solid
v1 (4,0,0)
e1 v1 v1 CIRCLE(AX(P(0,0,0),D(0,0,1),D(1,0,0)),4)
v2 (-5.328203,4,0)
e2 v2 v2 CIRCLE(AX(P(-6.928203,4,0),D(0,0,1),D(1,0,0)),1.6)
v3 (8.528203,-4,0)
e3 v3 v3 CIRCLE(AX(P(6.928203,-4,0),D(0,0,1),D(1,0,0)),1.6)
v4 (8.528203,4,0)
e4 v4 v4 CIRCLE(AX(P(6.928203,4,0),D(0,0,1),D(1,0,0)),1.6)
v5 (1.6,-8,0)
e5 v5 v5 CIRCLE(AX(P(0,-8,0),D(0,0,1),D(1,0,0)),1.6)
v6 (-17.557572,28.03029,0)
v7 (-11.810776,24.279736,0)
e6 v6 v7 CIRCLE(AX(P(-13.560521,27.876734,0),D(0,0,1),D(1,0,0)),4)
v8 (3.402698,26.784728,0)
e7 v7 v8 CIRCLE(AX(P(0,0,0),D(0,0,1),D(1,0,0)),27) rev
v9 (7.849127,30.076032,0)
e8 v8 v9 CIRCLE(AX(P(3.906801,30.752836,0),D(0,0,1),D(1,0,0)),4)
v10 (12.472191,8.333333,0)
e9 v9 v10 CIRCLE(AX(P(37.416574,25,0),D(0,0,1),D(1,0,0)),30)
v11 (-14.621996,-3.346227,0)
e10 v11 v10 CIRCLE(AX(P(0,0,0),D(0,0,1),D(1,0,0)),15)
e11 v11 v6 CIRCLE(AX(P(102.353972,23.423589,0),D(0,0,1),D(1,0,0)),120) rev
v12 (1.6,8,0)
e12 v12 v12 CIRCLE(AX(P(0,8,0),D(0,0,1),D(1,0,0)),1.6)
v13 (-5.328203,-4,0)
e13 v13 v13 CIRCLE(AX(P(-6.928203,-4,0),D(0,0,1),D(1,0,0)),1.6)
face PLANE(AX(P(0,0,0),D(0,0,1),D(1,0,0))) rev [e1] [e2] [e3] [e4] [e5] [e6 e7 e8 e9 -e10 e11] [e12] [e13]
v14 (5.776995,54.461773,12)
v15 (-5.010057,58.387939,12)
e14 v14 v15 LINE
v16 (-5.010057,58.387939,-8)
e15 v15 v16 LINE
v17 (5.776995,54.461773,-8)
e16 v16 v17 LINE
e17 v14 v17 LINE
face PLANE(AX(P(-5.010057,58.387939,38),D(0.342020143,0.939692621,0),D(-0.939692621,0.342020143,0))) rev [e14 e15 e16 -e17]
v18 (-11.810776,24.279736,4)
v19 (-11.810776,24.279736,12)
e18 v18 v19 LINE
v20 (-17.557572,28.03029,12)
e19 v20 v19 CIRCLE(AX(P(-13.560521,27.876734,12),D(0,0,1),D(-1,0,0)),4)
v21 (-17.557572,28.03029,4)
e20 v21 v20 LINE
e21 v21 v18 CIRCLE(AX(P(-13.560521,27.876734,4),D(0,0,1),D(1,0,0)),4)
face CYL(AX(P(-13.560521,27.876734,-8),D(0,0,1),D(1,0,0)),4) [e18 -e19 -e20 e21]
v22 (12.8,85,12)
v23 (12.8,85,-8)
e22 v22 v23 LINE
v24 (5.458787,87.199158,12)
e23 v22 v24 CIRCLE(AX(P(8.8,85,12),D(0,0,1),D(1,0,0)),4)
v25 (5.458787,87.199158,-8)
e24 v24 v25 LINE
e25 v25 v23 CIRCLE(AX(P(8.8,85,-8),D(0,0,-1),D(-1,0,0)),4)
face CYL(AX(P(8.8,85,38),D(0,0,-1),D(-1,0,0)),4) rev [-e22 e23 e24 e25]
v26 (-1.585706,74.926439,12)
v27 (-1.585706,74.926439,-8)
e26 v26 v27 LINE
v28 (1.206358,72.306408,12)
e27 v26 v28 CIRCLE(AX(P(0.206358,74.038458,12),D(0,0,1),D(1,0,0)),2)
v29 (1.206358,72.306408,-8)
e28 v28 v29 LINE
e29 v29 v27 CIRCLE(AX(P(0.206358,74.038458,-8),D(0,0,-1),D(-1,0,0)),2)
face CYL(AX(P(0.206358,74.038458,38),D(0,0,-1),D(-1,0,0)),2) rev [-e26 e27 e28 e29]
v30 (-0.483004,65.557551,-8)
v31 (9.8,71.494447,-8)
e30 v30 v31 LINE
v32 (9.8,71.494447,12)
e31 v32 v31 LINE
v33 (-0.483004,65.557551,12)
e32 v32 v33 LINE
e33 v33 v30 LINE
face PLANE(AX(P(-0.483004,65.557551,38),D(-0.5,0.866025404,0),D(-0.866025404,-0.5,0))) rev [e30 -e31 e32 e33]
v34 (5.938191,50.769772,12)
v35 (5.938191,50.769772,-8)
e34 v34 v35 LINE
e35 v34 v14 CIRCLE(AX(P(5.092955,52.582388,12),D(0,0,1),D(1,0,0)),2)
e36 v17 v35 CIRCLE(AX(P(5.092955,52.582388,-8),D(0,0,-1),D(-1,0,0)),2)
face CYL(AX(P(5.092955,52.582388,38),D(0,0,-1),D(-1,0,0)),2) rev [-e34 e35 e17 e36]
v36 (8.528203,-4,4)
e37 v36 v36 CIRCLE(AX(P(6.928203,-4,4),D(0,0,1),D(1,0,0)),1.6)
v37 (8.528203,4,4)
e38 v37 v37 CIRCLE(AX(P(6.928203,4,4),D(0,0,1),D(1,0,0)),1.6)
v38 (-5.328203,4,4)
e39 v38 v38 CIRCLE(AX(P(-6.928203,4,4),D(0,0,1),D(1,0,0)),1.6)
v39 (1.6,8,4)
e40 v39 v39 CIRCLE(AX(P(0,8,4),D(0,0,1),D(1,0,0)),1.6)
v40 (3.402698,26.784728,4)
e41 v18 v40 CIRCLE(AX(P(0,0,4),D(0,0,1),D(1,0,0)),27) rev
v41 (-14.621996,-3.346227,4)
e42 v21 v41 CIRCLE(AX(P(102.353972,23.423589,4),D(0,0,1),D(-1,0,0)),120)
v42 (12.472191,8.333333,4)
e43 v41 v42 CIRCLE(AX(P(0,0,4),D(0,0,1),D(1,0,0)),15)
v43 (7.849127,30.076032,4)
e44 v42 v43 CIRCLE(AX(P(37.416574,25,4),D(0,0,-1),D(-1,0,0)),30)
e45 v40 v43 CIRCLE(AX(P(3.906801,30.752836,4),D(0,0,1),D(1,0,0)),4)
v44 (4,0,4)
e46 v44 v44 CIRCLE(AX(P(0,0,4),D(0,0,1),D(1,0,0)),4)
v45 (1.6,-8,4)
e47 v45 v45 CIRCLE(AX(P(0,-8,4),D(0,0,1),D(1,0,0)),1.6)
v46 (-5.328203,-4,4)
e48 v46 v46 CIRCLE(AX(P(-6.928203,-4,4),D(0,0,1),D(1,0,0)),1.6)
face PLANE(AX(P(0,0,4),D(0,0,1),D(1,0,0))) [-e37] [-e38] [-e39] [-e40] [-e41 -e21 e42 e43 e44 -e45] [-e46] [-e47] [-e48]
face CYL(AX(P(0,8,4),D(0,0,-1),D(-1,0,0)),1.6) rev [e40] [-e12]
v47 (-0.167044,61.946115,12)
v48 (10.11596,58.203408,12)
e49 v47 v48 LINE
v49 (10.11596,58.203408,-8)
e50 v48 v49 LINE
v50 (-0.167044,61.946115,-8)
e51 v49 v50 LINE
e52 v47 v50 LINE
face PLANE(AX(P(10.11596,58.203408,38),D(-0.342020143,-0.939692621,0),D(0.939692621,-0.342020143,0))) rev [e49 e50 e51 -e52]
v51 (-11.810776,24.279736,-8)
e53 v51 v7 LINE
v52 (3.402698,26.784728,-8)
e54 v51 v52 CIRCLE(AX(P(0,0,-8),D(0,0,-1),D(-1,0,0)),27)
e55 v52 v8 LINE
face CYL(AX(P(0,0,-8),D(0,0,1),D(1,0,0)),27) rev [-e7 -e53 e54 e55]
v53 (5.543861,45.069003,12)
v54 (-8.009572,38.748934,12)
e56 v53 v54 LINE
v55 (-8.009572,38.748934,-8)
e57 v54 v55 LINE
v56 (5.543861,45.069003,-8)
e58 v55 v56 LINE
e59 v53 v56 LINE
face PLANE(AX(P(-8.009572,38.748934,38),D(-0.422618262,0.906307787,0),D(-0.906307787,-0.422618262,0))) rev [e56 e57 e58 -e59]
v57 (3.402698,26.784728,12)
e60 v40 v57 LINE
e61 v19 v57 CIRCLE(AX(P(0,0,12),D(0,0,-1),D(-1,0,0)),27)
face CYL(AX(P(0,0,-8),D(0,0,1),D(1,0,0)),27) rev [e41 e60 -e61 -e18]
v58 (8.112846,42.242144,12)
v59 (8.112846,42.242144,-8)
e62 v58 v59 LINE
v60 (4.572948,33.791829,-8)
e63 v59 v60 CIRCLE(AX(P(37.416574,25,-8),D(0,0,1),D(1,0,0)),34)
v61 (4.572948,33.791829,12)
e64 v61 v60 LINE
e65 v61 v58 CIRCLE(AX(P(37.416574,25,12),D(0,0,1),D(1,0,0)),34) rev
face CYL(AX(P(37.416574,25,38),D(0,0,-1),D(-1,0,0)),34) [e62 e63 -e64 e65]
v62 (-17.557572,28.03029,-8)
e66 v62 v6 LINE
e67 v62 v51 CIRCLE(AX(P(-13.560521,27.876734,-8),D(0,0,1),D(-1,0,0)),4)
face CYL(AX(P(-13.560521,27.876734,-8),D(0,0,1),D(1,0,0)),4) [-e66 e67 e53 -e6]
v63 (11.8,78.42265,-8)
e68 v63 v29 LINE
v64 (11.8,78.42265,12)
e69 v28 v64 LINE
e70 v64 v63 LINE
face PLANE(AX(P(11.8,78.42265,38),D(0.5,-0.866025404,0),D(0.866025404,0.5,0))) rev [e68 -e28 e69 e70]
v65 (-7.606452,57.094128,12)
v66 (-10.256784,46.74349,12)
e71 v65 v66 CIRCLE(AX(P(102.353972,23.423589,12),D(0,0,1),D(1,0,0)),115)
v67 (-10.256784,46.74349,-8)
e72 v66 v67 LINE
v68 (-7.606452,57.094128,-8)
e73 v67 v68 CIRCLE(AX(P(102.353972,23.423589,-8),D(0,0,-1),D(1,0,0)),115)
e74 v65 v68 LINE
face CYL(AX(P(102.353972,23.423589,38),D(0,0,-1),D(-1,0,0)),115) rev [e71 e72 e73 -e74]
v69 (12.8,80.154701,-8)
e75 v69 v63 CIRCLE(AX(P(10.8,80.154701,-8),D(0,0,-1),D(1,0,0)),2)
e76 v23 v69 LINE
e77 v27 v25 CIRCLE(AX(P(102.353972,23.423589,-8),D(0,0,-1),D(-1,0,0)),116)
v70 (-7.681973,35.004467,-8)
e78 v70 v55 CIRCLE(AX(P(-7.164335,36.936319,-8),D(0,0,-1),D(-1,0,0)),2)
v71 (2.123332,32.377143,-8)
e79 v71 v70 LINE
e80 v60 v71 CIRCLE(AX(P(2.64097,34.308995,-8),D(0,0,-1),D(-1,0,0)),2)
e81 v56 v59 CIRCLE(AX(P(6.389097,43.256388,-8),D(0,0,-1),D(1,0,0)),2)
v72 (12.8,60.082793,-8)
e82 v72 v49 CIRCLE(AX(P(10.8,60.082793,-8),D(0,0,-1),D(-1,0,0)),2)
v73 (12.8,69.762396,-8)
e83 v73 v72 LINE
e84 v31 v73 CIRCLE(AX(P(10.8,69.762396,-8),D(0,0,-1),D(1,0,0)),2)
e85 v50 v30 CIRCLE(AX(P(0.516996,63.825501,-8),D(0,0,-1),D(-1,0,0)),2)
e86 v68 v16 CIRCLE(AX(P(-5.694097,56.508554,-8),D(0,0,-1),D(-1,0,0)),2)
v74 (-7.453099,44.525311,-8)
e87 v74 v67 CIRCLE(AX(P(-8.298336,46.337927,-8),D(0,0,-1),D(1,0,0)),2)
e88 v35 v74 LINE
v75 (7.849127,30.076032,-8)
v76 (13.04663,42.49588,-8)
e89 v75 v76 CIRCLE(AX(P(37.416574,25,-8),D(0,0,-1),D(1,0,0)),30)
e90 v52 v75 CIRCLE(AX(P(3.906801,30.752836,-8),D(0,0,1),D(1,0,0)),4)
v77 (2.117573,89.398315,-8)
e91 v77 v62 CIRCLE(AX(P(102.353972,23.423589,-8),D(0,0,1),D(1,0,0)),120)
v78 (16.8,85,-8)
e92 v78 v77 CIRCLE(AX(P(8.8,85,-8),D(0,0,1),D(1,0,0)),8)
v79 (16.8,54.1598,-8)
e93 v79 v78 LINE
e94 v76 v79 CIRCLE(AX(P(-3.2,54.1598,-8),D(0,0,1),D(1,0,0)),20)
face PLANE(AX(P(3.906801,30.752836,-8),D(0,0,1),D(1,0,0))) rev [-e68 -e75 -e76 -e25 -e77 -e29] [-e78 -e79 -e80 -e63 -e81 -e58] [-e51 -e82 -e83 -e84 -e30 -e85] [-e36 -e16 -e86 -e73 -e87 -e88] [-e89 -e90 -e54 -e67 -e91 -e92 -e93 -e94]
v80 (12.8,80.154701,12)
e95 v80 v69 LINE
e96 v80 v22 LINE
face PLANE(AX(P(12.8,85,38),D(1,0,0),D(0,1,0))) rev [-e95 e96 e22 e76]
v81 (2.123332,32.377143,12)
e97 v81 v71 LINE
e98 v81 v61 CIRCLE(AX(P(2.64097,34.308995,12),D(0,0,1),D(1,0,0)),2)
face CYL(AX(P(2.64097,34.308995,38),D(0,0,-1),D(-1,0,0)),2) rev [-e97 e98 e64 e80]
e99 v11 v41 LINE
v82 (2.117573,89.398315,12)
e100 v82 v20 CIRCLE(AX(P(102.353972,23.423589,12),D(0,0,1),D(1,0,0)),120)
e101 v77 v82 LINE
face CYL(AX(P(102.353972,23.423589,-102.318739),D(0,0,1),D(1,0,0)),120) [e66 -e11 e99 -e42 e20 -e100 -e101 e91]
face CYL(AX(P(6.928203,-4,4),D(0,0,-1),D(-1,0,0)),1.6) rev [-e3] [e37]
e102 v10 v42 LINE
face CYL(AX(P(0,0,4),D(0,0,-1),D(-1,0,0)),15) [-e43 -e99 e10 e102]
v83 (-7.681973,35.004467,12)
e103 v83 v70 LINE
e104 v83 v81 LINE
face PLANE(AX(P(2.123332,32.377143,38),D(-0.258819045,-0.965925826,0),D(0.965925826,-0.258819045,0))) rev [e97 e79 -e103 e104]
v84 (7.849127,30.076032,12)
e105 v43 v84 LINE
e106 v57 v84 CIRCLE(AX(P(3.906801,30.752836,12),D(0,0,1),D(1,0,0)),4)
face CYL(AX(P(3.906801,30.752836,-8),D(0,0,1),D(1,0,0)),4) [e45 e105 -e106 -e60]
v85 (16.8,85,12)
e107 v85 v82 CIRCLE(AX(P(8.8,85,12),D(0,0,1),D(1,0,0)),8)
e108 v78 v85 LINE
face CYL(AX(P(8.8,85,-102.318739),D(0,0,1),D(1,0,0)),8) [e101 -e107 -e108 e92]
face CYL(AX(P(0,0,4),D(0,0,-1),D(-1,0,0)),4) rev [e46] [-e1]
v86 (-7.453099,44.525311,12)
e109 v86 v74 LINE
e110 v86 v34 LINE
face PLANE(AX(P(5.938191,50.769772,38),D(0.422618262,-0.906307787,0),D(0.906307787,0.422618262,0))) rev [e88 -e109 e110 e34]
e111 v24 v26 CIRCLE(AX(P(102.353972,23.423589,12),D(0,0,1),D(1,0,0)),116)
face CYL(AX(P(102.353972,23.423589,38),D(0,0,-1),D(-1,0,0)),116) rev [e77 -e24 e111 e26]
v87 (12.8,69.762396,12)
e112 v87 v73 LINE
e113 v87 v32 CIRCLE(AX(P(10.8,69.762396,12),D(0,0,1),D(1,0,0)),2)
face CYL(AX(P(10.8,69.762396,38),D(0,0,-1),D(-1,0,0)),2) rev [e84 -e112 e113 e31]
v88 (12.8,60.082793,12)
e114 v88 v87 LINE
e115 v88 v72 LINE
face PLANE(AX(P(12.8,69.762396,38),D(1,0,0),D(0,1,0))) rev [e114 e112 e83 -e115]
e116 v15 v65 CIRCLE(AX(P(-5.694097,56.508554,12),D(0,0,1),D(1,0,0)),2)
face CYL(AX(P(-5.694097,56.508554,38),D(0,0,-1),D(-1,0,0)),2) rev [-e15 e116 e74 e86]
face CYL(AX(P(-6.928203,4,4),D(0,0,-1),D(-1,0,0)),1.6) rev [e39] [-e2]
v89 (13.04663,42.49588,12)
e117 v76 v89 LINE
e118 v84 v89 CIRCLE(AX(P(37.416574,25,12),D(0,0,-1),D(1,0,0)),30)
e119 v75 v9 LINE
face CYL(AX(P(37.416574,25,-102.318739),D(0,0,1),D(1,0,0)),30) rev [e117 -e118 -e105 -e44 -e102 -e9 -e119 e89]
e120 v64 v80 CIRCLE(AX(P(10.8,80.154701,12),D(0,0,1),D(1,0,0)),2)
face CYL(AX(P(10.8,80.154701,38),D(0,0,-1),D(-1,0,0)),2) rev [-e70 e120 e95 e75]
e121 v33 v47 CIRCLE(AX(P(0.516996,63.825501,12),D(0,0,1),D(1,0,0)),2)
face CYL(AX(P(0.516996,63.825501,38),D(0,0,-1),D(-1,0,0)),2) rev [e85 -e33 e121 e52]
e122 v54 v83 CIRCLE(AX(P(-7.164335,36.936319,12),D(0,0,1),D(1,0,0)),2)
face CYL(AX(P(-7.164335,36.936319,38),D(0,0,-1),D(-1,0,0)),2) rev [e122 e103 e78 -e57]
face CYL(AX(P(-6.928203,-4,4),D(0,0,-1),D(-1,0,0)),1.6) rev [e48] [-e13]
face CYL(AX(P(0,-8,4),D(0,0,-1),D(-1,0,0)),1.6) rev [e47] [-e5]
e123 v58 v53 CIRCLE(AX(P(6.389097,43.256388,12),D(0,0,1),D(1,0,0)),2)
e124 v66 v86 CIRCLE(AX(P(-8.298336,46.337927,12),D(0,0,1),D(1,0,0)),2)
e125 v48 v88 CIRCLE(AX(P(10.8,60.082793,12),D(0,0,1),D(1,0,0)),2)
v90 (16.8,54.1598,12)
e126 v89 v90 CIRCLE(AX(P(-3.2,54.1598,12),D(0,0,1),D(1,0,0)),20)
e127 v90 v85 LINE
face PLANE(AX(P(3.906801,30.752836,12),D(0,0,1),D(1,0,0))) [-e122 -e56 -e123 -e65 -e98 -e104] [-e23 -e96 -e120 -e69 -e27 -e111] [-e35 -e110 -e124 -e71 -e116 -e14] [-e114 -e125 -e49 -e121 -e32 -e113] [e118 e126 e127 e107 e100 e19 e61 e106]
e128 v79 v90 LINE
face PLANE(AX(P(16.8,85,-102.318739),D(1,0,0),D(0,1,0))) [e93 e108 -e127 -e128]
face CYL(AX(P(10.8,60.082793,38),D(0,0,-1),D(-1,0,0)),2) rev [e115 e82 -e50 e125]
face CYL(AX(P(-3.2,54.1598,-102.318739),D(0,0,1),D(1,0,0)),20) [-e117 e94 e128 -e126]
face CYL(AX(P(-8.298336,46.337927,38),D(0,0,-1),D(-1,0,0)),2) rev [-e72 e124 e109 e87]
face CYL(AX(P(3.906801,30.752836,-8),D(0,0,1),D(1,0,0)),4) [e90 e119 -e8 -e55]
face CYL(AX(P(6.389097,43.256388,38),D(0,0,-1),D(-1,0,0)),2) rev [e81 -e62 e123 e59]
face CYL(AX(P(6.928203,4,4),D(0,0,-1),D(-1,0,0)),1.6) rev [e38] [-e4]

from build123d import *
from build123d.topology import SkipClean

# Parameters (mm, degrees)
SKETCH_1_R           = 15
SKETCH_1_R_2         = 4
SKETCH_1_R_3         = 1.6
EXTRUDE_1_DEPTH      = 4
EXTRUDE_START        = -4
EXTRUDE_3_DEPTH      = 4
EXTRUDE_4_DEPTH      = 8
EXTRUDE_4_DEPTH_BACK = 12
CUT_EXTRUDE_1_DEPTH  = 46


with BuildPart() as part:
    # 草图1 → 凸台-拉伸1 (new body)
    with BuildSketch(Plane.XY):
        Circle(SKETCH_1_R)
        Circle(SKETCH_1_R_2, mode=Mode.SUBTRACT)
        with Locations((0, 8)):
            Circle(SKETCH_1_R_3, mode=Mode.SUBTRACT)
        with Locations((6.92820323, 4)):
            Circle(SKETCH_1_R_3, mode=Mode.SUBTRACT)
        with Locations((6.92820323, -4)):
            Circle(SKETCH_1_R_3, mode=Mode.SUBTRACT)
        with Locations((0, -8)):
            Circle(SKETCH_1_R_3, mode=Mode.SUBTRACT)
        with Locations((-6.92820323, -4)):
            Circle(SKETCH_1_R_3, mode=Mode.SUBTRACT)
        with Locations((-6.92820323, 4)):
            Circle(SKETCH_1_R_3, mode=Mode.SUBTRACT)
    extrude(amount=EXTRUDE_1_DEPTH)

    # 草图2 → 凸台-拉伸3 (add)
    with BuildSketch(Plane.XY.offset(4).offset(EXTRUDE_START)):
        with BuildLine():
            Line((16.8, 85), (16.8, 54.159799849))
            ThreePointArc((16.8, 54.159799849), (15.83854762, 48.033324147), (13.046629547, 42.49587991))
            ThreePointArc((13.046629547, 42.49587991), (7.420814059, 25.504374344), (12.472191289, 8.333333333))
            ThreePointArc((12.472191289, 8.333333333), (-5.937882388, 13.774670695), (-14.621995932, -3.346226976))
            ThreePointArc((-14.621995932, -3.346226976), (-15.737901413, 44.738127218), (2.117573463, 89.398315084))
            ThreePointArc((2.117573463, 89.398315084), (11.095712057, 92.663530919), (16.8, 85))
        make_face()
    extrude(amount=EXTRUDE_3_DEPTH)

    # 草图3 → 凸台-拉伸4 (add, two sides: drawn at the far end of the back side and taken through both)
    with SkipClean():  # the faces are left unmerged after this step: merging them gives an invalid solid
        with BuildSketch(Plane.XY.offset(4).offset(-EXTRUDE_4_DEPTH_BACK)):
            with BuildLine():
                Line((16.8, 54.159799849), (16.8, 85))
                ThreePointArc((16.8, 85), (11.095712057, 92.663530919), (2.117573463, 89.398315084))
                ThreePointArc((2.117573463, 89.398315084), (-11.916705707, 60.059804871), (-17.55757213, 28.030290369))
                ThreePointArc((-17.55757213, 28.030290369), (-15.746673, 24.526996644), (-11.810776072, 24.27973576))
                ThreePointArc((-11.810776072, 24.27973576), (-4.386649325, 26.64127076), (3.402697603, 26.784727906))
                ThreePointArc((3.402697603, 26.784727906), (6.286614818, 27.53779516), (7.849127177, 30.076031539))
                ThreePointArc((7.849127177, 30.076031539), (9.742150736, 36.581291134), (13.046629547, 42.49587991))
                ThreePointArc((13.046629547, 42.49587991), (15.83854762, 48.033324147), (16.8, 54.159799849))
            make_face()
        extrude(amount=EXTRUDE_4_DEPTH + EXTRUDE_4_DEPTH_BACK)
    add(part.part.scale(1), mode=Mode.REPLACE)  # the faces are merged on a copy

    # 草图5 → 切除-拉伸1 (cut)
    with BuildSketch(Plane(origin=(0, 0, -8), x_dir=(-1, 0, 0), z_dir=(0, 0, -1))):
        with BuildLine():
            Line((-12.8, 69.762395693), (-12.8, 60.082793322))
            ThreePointArc((-12.8, 60.082793322), (-11.947152873, 58.444489233), (-10.115959713, 58.20340808))
            Line((-10.115959713, 58.20340808), (0.167044148, 61.946115404))
            ThreePointArc((0.167044148, 61.946115404), (1.475393257, 63.65118916), (0.483003861, 65.557551453))
            Line((0.483003861, 65.557551453), (-9.8, 71.494446501))
            ThreePointArc((-9.8, 71.494446501), (-11.8, 71.494446501), (-12.8, 69.762395693))
        make_face()
        with BuildLine():
            Line((-11.8, 78.422649731), (-1.206357847, 72.306407582))
            ThreePointArc((-1.206357847, 72.306407582), (1.162211364, 72.580028303), (1.585705551, 74.926438557))
            ThreePointArc((1.585705551, 74.926438557), (-1.749223409, 81.170317372), (-5.458786731, 87.199157542))
            ThreePointArc((-5.458786731, 87.199157542), (-9.947856029, 88.83176546), (-12.8, 85))
            Line((-12.8, 85), (-12.8, 80.154700538))
            ThreePointArc((-12.8, 80.154700538), (-12.532050808, 79.154700538), (-11.8, 78.422649731))
        make_face()
        with BuildLine():
            Line((5.01005666, 58.38793894), (-5.776995128, 54.461773174))
            ThreePointArc((-5.776995128, 54.461773174), (-7.091051284, 52.669626708), (-5.938191364, 50.769772359))
            Line((-5.938191364, 50.769772359), (7.453099332, 44.525310955))
            ThreePointArc((7.453099332, 44.525310955), (9.539258698, 44.76945259), (10.256783773, 46.743490028))
            ThreePointArc((10.256783773, 46.743490028), (9.051891671, 51.949605837), (7.60645214, 57.094128298))
            ThreePointArc((7.60645214, 57.094128298), (6.586103601, 58.298616303), (5.01005666, 58.38793894))
        make_face()
        with BuildLine():
            Line((-2.123332063, 32.377143259), (7.681973135, 35.004466868))
            ThreePointArc((7.681973135, 35.004466868), (9.156724441, 36.762007035), (8.009571568, 38.748934095))
            Line((8.009571568, 38.748934095), (-5.543860738, 45.069003373))
            ThreePointArc((-5.543860738, 45.069003373), (-7.869208523, 44.601479118), (-8.112845962, 42.242144033))
            ThreePointArc((-8.112845962, 42.242144033), (-6.056960525, 38.136767143), (-4.572948137, 33.791828527))
            ThreePointArc((-4.572948137, 33.791828527), (-3.641181599, 32.577066199), (-2.123332063, 32.377143259))
        make_face()
    extrude(amount=-CUT_EXTRUDE_1_DEPTH, mode=Mode.SUBTRACT)


solid = part.part
